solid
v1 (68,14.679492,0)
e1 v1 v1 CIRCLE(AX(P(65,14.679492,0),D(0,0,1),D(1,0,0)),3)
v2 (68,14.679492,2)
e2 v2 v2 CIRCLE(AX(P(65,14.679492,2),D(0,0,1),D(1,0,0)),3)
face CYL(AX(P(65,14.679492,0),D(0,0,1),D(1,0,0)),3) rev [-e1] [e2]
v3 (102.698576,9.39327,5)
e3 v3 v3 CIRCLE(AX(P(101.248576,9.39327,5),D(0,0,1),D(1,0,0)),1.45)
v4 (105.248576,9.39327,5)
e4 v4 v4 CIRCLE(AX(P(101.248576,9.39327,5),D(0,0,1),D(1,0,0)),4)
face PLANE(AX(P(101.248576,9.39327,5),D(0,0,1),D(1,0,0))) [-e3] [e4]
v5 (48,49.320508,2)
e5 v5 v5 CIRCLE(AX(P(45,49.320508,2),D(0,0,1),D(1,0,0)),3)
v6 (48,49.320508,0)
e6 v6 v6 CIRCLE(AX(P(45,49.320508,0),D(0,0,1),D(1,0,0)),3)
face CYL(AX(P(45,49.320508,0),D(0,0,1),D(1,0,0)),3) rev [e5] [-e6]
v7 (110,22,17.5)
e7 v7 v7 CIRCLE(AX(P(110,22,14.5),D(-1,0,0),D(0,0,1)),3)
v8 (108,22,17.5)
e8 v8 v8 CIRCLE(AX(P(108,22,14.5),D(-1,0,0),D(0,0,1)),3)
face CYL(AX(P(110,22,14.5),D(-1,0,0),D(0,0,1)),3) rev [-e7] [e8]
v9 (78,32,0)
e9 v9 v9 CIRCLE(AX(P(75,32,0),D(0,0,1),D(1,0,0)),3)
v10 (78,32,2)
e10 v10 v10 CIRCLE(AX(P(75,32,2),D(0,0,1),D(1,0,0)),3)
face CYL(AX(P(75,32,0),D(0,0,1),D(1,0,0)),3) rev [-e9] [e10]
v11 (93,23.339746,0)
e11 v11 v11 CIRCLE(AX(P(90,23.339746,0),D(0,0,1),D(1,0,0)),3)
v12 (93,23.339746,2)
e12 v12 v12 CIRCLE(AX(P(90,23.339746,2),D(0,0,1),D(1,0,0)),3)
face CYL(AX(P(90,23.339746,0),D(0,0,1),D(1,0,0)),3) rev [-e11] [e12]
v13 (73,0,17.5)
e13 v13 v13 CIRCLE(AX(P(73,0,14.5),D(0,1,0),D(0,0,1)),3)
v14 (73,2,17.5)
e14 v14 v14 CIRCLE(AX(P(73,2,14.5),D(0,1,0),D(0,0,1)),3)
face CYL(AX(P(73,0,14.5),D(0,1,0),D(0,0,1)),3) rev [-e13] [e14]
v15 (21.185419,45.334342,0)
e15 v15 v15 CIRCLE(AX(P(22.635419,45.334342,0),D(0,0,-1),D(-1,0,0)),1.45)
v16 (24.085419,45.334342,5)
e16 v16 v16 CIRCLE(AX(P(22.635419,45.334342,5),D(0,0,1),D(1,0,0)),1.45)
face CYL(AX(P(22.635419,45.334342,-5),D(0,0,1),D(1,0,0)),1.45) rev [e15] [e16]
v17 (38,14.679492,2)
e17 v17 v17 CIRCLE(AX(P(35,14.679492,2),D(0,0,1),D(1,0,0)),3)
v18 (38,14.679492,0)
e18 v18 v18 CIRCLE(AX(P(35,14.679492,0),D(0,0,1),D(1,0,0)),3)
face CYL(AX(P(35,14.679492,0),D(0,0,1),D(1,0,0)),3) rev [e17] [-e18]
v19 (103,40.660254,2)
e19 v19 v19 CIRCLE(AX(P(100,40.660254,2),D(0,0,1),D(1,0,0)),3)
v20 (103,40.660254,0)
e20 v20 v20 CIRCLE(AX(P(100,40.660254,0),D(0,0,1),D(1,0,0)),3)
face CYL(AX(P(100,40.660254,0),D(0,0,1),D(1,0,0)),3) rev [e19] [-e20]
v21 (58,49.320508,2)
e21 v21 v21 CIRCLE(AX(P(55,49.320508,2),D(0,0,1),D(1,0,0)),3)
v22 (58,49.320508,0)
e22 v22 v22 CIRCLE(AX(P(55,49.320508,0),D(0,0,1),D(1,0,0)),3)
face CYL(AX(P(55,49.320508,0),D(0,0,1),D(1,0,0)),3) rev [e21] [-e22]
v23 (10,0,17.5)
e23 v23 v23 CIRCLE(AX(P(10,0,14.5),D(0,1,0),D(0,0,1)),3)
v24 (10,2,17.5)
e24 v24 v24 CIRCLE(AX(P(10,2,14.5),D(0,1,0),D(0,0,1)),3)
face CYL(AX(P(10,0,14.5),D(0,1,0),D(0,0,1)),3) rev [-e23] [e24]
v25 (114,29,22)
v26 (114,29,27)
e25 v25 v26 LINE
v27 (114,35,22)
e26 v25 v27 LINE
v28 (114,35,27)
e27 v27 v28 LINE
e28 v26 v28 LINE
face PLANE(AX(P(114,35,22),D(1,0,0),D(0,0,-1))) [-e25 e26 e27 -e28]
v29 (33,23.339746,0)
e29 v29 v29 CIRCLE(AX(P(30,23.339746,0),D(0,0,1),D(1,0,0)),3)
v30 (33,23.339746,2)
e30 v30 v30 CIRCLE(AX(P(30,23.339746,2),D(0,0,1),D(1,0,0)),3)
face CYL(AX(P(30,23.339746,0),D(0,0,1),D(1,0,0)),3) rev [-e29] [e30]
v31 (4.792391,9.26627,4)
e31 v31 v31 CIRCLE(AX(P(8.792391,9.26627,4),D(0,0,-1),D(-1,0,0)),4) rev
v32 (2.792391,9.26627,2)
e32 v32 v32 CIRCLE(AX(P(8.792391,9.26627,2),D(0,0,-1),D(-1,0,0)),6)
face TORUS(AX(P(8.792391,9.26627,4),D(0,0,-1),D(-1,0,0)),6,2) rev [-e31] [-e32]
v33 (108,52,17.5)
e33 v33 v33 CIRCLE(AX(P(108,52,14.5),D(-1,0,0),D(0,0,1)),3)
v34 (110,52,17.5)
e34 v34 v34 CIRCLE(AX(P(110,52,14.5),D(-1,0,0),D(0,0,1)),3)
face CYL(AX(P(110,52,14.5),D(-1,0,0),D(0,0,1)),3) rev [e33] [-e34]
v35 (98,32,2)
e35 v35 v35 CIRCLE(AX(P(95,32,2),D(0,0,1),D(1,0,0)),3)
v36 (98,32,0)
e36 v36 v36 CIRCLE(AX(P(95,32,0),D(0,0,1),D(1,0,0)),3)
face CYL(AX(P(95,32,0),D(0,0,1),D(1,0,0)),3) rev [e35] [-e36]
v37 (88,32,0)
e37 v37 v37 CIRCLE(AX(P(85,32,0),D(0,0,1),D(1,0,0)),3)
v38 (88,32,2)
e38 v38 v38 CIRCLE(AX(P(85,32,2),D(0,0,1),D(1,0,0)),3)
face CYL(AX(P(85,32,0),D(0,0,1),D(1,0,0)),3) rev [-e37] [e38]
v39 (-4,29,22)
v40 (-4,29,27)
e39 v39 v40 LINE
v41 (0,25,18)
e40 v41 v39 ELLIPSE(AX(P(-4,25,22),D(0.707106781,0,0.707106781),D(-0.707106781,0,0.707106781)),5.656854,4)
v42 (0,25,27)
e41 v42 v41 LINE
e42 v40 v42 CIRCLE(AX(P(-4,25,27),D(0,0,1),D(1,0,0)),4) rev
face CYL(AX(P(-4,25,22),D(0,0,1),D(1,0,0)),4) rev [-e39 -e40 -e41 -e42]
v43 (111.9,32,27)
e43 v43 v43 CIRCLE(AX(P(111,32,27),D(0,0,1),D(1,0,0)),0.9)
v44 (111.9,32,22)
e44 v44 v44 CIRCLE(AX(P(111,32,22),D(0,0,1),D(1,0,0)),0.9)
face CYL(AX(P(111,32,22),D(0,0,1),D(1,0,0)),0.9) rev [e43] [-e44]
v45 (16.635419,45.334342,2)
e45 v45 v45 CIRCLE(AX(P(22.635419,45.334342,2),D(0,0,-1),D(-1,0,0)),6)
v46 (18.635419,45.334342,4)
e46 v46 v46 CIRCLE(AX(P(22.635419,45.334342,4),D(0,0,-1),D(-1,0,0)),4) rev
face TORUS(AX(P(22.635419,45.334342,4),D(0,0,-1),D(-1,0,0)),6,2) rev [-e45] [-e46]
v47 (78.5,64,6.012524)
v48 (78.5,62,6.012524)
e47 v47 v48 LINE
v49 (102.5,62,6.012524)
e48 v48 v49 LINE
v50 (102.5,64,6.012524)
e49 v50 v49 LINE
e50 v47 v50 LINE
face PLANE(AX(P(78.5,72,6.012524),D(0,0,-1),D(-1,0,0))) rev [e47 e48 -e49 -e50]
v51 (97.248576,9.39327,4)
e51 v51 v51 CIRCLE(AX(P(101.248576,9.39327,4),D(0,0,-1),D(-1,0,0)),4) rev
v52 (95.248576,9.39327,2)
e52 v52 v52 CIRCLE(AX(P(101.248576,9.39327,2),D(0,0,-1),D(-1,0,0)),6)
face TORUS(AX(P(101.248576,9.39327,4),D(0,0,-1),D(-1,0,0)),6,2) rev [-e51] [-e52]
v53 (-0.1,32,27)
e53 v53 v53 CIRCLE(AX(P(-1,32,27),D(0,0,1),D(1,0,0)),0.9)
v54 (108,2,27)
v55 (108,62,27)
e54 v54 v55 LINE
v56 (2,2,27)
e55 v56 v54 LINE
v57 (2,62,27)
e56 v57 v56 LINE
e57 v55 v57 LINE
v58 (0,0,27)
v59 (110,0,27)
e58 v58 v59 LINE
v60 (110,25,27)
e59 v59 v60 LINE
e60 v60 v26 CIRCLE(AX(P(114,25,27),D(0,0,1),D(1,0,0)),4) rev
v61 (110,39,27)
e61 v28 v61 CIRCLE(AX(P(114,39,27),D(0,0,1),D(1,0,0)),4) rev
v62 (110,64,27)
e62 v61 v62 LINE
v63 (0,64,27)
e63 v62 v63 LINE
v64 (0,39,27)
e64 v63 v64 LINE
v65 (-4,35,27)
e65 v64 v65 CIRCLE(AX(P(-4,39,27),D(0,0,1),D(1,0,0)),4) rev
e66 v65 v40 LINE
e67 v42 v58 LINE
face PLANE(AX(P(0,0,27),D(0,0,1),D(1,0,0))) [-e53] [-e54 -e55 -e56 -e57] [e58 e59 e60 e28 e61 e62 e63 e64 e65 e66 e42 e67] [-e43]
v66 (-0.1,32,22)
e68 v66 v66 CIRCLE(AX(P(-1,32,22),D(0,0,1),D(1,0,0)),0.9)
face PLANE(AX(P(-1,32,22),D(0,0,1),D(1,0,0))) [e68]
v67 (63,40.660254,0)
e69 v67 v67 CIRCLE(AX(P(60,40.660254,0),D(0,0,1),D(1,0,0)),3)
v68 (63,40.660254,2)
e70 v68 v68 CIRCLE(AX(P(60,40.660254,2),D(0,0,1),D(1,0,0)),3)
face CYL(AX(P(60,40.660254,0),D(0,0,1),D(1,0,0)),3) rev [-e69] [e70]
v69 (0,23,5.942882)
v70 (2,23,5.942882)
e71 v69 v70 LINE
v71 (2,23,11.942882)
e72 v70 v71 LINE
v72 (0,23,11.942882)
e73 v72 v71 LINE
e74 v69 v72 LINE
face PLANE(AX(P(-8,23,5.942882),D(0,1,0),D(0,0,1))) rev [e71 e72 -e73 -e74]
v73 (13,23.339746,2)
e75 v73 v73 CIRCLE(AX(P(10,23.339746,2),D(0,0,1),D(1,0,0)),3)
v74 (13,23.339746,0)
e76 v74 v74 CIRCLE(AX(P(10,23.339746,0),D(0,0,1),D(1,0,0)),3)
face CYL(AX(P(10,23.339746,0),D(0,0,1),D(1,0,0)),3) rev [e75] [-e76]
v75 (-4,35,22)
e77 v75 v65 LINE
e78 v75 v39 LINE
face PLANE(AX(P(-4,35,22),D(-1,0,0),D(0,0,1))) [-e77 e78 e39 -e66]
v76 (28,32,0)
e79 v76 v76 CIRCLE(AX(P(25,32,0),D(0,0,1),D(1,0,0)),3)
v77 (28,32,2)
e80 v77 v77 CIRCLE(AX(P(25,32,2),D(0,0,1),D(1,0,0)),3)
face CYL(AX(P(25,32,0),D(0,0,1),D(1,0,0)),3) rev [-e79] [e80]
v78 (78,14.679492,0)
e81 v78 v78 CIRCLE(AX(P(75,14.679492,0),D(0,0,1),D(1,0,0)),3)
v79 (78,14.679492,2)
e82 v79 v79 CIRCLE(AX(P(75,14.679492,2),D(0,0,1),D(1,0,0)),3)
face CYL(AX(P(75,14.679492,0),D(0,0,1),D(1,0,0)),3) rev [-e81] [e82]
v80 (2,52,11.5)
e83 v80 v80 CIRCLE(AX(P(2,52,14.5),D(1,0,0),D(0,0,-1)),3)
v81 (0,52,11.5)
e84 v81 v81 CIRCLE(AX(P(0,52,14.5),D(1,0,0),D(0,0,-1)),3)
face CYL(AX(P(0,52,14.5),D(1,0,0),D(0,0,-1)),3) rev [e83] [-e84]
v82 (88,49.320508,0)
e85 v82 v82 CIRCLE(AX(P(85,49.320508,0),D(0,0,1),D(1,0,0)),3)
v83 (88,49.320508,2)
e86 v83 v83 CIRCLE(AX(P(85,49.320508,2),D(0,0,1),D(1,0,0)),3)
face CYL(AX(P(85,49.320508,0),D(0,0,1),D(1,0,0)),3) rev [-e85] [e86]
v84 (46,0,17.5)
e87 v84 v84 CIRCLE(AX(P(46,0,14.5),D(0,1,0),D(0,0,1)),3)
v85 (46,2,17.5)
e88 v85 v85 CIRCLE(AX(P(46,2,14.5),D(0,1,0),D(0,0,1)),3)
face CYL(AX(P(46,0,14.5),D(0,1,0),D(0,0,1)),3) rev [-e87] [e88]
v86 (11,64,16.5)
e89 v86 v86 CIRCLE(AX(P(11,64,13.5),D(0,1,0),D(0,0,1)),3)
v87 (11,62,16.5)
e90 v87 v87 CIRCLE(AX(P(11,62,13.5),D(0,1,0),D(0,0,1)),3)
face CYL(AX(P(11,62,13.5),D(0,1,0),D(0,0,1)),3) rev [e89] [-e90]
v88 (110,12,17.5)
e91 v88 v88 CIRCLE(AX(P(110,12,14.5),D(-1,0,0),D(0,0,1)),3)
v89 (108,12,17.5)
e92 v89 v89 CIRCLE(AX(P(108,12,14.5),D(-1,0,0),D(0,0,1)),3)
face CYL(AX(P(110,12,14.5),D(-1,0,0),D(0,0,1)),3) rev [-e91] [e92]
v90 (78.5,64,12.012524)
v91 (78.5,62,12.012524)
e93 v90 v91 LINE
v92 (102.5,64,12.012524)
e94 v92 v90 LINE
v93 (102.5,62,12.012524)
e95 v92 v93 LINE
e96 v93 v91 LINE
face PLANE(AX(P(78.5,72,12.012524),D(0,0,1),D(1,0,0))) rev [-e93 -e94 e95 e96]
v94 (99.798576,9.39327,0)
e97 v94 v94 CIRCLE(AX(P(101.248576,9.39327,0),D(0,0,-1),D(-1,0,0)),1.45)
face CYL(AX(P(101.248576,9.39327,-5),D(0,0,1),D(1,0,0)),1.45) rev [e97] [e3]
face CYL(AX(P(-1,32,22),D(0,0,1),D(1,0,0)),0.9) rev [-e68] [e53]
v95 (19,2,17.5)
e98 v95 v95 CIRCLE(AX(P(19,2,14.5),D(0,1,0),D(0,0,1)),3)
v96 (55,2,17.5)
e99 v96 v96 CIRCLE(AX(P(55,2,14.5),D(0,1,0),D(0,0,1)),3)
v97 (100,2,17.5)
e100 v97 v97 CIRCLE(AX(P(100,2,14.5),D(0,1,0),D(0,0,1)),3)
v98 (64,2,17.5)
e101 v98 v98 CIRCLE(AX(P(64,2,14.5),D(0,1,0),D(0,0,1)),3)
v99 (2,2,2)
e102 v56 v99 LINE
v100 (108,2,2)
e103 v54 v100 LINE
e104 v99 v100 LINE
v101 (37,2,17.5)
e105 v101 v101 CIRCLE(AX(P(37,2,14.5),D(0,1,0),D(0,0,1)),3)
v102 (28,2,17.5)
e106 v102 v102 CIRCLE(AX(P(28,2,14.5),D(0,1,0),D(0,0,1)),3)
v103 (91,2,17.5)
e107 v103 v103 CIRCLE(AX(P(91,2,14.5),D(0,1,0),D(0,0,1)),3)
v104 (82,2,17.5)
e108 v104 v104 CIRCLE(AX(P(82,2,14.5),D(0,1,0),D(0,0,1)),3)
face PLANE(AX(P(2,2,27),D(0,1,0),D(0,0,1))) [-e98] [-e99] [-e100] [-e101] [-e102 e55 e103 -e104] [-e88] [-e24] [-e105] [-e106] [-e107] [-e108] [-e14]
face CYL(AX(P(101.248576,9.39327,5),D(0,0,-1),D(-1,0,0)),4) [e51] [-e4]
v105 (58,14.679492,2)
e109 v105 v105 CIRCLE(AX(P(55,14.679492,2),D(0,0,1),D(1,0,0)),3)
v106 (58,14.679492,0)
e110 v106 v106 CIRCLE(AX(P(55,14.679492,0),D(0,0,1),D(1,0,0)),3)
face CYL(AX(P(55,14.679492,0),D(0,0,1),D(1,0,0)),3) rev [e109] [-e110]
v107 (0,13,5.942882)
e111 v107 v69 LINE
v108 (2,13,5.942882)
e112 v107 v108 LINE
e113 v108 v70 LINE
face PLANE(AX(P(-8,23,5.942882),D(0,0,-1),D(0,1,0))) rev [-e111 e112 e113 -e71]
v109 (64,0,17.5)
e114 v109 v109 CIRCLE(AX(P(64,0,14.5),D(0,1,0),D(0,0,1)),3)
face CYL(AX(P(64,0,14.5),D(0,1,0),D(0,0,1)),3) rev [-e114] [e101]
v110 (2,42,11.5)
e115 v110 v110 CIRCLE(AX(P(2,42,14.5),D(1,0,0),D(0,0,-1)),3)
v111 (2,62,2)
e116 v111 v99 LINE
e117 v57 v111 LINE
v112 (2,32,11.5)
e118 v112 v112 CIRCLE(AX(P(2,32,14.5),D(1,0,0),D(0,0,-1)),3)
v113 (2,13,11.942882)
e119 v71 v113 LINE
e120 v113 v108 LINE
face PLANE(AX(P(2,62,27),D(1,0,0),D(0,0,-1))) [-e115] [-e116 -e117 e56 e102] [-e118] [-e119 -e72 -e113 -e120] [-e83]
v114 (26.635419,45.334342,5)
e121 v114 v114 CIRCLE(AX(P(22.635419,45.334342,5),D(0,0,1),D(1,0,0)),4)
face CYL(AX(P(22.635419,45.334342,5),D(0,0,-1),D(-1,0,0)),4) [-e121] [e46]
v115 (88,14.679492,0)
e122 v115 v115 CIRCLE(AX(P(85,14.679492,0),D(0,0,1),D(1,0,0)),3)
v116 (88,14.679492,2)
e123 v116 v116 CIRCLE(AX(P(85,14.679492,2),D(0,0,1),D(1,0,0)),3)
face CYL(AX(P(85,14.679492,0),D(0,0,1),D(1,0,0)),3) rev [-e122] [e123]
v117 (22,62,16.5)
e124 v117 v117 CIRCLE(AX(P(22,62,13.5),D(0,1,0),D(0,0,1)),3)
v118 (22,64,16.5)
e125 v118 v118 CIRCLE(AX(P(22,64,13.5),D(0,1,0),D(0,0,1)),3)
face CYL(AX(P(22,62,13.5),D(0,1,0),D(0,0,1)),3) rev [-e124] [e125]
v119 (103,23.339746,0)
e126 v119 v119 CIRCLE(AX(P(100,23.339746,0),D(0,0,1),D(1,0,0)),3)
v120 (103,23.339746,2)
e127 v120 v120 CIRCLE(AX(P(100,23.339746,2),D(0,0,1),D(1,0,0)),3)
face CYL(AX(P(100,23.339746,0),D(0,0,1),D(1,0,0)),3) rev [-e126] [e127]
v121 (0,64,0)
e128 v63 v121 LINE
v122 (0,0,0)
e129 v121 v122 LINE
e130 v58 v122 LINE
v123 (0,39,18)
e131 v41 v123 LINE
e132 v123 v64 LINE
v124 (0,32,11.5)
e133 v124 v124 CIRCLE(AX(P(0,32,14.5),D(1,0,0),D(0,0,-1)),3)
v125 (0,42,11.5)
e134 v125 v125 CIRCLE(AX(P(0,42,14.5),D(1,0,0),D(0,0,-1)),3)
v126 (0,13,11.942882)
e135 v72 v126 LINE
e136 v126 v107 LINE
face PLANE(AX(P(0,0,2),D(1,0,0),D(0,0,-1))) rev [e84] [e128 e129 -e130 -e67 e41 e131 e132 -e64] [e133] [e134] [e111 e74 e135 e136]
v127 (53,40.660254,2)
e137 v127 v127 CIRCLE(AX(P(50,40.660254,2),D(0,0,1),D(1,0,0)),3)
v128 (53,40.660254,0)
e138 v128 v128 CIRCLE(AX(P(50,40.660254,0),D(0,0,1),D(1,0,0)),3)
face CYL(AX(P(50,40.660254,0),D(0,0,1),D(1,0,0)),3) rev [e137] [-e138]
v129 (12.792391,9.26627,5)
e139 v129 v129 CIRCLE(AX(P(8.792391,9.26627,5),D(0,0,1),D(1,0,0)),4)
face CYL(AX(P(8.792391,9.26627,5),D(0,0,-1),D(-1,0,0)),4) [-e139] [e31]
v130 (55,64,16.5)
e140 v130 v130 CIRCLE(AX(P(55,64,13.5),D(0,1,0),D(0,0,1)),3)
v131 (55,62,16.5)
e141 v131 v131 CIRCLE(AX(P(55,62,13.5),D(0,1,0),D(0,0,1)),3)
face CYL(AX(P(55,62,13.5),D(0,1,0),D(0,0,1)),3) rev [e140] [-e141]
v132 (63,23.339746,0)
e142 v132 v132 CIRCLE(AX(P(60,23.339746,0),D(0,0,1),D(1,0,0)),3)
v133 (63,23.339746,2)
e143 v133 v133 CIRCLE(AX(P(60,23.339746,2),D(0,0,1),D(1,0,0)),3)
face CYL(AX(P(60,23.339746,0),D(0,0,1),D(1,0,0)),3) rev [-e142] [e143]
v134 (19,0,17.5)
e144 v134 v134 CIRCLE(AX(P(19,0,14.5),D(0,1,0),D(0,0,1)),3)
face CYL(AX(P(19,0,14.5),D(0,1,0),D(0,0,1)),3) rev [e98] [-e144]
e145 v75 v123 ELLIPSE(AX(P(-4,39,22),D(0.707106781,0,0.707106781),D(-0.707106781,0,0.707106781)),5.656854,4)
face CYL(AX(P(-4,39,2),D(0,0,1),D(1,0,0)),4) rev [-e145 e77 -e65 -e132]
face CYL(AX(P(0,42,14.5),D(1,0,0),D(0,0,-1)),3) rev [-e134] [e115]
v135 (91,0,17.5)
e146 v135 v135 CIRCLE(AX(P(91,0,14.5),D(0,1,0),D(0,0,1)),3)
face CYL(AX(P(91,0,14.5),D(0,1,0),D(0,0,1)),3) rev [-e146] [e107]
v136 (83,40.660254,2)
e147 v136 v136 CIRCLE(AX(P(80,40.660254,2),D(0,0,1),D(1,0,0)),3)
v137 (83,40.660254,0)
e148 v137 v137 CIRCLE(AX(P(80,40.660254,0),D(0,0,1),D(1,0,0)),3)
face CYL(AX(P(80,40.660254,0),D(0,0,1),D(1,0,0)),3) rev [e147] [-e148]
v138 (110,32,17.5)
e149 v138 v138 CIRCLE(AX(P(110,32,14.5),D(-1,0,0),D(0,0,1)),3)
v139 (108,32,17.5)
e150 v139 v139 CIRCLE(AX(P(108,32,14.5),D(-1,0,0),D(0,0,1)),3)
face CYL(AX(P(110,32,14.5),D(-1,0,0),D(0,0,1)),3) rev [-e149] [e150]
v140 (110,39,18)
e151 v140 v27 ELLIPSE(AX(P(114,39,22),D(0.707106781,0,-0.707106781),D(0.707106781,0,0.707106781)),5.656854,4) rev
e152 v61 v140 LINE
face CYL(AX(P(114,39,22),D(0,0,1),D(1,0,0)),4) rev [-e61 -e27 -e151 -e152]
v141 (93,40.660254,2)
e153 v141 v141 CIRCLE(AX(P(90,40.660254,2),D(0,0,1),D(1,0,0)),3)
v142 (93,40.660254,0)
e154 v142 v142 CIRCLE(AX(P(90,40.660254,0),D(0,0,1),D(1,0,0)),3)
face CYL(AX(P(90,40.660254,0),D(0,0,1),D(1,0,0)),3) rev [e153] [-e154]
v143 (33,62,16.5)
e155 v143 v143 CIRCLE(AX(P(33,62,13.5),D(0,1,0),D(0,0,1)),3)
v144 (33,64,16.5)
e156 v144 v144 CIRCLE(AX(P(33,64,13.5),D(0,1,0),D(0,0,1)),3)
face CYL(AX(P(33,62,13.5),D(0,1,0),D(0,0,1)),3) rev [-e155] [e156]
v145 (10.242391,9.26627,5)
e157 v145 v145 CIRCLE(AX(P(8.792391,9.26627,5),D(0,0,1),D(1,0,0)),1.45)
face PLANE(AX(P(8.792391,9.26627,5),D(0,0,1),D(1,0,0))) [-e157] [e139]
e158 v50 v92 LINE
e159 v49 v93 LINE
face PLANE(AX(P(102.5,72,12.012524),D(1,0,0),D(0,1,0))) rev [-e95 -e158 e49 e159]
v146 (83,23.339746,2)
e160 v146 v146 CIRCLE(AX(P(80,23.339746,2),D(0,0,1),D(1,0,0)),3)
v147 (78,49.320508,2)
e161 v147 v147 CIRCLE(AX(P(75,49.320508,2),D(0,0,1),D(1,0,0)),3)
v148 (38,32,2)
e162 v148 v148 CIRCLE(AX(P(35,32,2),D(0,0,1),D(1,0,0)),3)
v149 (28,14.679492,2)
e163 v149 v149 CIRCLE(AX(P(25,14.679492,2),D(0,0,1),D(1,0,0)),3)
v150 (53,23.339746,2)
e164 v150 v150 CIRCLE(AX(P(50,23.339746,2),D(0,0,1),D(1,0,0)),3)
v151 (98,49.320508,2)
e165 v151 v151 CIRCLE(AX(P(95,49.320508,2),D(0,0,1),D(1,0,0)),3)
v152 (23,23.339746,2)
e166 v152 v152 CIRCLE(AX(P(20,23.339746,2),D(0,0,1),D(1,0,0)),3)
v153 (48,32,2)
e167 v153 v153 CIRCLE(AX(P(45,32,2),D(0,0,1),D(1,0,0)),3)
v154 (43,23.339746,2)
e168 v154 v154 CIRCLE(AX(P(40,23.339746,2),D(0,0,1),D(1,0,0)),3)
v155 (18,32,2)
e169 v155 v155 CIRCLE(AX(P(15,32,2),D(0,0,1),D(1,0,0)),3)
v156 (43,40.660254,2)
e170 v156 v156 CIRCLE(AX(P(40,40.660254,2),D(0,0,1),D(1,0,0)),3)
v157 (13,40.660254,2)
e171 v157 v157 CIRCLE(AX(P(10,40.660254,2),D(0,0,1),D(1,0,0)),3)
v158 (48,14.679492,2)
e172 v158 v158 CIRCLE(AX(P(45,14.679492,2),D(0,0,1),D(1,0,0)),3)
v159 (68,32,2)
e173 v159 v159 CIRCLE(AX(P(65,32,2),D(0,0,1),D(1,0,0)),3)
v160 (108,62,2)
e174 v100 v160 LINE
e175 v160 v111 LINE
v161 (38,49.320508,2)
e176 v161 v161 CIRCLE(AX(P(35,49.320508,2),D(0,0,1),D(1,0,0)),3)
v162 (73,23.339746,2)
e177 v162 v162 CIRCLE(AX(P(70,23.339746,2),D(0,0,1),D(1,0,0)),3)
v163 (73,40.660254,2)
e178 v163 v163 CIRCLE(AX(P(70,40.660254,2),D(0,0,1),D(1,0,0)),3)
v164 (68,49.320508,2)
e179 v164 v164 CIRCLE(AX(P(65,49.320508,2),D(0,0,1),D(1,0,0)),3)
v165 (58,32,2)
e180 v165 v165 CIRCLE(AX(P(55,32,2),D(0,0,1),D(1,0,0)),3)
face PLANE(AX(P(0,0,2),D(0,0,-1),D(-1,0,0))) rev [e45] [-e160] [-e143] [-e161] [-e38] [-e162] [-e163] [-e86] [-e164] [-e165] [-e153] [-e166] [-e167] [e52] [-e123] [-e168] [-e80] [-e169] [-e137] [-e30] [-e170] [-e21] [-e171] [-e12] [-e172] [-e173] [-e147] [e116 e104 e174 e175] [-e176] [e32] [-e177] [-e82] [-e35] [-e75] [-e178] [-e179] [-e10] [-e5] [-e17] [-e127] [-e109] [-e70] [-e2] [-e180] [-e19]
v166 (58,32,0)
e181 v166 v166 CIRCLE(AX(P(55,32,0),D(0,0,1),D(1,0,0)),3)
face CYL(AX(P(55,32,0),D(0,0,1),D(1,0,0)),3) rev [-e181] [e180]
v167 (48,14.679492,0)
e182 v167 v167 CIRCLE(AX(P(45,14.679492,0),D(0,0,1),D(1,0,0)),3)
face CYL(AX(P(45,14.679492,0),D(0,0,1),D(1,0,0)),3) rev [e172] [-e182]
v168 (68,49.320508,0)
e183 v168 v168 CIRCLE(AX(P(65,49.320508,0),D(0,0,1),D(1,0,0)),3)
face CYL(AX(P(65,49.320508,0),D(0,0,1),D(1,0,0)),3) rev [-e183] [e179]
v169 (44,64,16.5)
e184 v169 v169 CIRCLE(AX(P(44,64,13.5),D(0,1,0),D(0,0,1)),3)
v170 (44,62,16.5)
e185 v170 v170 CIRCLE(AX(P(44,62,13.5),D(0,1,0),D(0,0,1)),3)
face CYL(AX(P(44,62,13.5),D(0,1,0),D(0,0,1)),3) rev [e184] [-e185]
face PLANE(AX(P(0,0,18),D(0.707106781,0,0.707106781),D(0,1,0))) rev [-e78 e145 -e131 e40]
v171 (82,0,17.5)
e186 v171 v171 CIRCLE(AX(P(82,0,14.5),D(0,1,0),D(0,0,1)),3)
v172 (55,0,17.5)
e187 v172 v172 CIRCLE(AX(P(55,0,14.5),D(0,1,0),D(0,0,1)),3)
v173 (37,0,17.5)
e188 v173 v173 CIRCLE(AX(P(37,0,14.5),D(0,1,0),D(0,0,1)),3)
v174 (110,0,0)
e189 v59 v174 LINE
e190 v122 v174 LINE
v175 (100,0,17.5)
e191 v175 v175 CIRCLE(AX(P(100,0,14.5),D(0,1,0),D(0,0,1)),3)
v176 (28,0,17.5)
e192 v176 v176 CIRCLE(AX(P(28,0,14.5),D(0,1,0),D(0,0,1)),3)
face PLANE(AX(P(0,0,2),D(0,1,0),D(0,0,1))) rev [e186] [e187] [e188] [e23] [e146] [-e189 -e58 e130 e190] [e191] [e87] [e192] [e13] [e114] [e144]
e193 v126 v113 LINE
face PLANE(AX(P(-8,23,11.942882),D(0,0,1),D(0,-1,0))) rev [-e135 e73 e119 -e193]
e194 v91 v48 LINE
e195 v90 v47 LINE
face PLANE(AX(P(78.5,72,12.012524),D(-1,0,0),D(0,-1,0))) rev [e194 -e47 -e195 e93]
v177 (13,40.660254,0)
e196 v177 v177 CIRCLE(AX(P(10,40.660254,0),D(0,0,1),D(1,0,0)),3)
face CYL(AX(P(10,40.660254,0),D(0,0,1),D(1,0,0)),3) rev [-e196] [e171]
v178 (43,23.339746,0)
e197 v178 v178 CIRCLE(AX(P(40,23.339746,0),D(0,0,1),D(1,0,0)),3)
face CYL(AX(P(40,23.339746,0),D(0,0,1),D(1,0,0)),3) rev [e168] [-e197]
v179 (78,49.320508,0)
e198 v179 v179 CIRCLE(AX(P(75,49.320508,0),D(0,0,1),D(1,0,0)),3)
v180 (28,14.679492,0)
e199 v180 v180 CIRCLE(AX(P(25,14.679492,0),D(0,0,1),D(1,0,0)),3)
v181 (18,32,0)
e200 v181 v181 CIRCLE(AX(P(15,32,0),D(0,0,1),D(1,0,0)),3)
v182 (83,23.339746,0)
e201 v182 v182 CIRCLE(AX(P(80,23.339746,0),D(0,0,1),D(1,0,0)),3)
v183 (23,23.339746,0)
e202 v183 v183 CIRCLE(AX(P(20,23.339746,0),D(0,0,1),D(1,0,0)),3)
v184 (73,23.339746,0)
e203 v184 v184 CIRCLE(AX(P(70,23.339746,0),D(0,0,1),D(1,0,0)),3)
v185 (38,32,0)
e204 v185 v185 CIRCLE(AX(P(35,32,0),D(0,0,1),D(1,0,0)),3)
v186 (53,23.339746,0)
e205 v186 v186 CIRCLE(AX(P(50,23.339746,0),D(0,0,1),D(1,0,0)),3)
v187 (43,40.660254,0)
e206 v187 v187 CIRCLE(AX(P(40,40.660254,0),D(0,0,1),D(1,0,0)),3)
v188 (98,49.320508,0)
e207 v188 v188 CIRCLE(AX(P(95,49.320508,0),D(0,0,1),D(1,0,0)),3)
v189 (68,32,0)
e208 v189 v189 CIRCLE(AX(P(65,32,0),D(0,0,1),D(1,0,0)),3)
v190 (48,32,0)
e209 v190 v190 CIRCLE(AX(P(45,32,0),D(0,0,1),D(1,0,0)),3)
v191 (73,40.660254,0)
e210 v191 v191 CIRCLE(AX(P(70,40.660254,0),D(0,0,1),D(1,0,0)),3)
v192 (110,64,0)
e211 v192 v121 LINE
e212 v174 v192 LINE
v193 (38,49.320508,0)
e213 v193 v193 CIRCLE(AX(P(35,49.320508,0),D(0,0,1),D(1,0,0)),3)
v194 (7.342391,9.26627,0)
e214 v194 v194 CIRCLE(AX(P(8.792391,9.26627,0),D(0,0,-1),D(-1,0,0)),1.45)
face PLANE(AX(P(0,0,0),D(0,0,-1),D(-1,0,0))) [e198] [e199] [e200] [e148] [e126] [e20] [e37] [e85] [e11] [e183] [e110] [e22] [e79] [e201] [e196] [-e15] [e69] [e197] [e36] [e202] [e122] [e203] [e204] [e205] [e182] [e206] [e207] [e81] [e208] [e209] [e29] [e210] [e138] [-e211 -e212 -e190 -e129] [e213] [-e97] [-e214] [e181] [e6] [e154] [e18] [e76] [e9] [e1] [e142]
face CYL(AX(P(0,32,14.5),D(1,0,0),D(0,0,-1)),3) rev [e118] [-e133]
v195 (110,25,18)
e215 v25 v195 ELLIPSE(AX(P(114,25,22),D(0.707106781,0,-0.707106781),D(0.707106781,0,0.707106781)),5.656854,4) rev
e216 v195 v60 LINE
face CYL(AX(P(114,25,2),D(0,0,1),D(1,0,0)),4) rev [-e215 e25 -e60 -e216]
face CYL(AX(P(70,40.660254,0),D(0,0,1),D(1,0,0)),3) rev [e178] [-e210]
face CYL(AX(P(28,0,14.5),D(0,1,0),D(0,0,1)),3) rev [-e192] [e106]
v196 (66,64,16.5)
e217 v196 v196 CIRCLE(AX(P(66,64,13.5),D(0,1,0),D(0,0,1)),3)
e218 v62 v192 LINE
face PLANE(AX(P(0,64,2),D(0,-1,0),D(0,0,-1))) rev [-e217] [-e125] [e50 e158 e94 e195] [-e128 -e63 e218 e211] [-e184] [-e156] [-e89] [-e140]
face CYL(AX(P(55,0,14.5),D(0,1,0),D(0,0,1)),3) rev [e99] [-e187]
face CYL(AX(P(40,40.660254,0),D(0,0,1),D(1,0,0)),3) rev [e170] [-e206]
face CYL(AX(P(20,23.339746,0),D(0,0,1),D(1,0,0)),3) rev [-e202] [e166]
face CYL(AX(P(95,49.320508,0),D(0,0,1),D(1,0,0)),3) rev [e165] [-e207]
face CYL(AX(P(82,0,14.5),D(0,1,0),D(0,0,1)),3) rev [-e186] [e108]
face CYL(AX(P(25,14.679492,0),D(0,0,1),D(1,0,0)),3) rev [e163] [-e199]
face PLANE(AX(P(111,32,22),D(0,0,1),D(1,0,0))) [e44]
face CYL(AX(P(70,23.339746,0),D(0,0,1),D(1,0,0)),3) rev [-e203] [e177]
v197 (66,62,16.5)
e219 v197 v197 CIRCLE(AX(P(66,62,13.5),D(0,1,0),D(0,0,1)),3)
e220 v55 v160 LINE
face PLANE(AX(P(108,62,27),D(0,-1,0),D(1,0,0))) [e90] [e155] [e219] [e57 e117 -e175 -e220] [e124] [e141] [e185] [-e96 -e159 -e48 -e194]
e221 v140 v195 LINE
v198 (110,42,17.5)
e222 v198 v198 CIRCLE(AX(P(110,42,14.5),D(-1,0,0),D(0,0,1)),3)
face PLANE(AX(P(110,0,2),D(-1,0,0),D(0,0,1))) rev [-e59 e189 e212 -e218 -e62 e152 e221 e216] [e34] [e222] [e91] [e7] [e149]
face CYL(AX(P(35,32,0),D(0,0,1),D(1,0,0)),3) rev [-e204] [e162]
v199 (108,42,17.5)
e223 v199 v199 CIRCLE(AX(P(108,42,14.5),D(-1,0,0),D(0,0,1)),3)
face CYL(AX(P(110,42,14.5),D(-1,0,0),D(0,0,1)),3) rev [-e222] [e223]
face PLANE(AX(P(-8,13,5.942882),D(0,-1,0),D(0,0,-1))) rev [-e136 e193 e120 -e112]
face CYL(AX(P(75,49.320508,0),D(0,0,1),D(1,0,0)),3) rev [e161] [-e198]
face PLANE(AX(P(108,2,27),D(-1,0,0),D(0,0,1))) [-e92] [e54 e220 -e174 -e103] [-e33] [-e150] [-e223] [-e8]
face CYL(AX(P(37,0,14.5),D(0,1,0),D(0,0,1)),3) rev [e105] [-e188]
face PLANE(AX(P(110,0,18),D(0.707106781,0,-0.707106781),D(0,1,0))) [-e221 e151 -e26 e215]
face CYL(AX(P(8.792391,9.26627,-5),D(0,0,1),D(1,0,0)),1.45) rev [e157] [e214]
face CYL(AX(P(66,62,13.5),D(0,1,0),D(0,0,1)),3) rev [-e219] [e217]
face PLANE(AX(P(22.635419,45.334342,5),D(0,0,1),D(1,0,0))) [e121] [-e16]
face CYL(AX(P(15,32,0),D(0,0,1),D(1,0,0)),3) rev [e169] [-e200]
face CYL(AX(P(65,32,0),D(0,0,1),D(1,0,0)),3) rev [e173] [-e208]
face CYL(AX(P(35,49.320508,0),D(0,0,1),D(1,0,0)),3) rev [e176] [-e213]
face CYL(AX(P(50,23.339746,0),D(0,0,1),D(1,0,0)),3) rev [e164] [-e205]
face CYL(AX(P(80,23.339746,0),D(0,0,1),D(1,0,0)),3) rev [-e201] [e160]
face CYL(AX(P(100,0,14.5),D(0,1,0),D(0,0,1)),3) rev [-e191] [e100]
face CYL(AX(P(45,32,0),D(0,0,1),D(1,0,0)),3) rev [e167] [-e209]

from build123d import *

# Parameters (mm, degrees)
SKETCH_1_W          = 110
SKETCH_1_H          = 64
EXTRUDE_1_DEPTH     = 2
SKETCH_2_W          = 110
SKETCH_2_H          = 64
SKETCH_2_W_2        = 106
SKETCH_2_H_2        = 60
EXTRUDE_2_DEPTH     = 25
SKETCH_3_R          = 4
EXTRUDE_3_DEPTH     = 3
SKETCH_4_R          = 1.45
CUT_EXTRUDE_1_DEPTH = 10
FILLET_1_R          = 2
SKETCH_5_W          = 24
SKETCH_5_H          = 6
CUT_EXTRUDE_2_DEPTH = 10
SKETCH_6_W          = 6
SKETCH_6_H          = 10
CUT_EXTRUDE_3_DEPTH = 10
SKETCH_7_W          = 4
SKETCH_7_H          = 6
EXTRUDE_4_DEPTH     = 5
CHAMFER_1_SIZE      = 4
SKETCH_8_R          = 0.9
CUT_EXTRUDE_4_DEPTH = 5
SKETCH_9_R          = 3
CUT_EXTRUDE_5_DEPTH = 2
OTHER_1_OUTLINE_R   = 3
OTHER_1_DEPTH       = 2
SKETCH_10_R         = 3
CUT_EXTRUDE_6_DEPTH = 2
OTHER_START         = 62
OTHER_2_OUTLINE_R   = 3
OTHER_2_DEPTH       = 2
SKETCH_11_R         = 3
CUT_EXTRUDE_7_DEPTH = 2
OTHER_3_OUTLINE_R   = 3
OTHER_3_DEPTH       = 2
SKETCH_12_R         = 3
CUT_EXTRUDE_8_DEPTH = 2
OTHER_4_OUTLINE_R   = 3
OTHER_4_DEPTH       = 2
CUT_EXTRUDE_START   = -2
SKETCH_13_R         = 3
CUT_EXTRUDE_9_DEPTH = 2
OTHER_START_2       = 108
OTHER_5_OUTLINE_R   = 3
OTHER_5_DEPTH       = 2
FILLET_2_R          = 4


with BuildPart() as part:
    # 草图1 → 凸台-拉伸1 (new body)
    with BuildSketch(Plane.XY):
        with Locations((55, 32)):
            Rectangle(SKETCH_1_W, SKETCH_1_H)
    extrude(amount=EXTRUDE_1_DEPTH)

    # 草图2 → 凸台-拉伸2 (add)
    with BuildSketch(Plane.XY.offset(2)):
        with Locations((55, 32)):
            Rectangle(SKETCH_2_W, SKETCH_2_H)
        with Locations((55, 32)):
            Rectangle(SKETCH_2_W_2, SKETCH_2_H_2, mode=Mode.SUBTRACT)
    extrude(amount=EXTRUDE_2_DEPTH)

    # 草图3 → 凸台-拉伸3 (add)
    with BuildSketch(Plane.XY.offset(2)):
        with Locations(Location((22.635418977, 45.334342238, 0), (0, 0, 180))):
            Circle(SKETCH_3_R)
        with Locations(Location((8.792391291, 9.266270102, 0), (0, 0, 180))):
            Circle(SKETCH_3_R)
        with Locations(Location((101.248576203, 9.393270356, 0), (0, 0, 180))):
            Circle(SKETCH_3_R)
    extrude(amount=EXTRUDE_3_DEPTH)

    # 草图4 → 切除-拉伸1 (cut)
    with BuildSketch(Plane.XY.offset(5)):
        with Locations((22.635418977, 45.334342238)):
            Circle(SKETCH_4_R)
        with Locations((8.792391291, 9.266270102)):
            Circle(SKETCH_4_R)
        with Locations((101.248576203, 9.393270356)):
            Circle(SKETCH_4_R)
    extrude(amount=-CUT_EXTRUDE_1_DEPTH, mode=Mode.SUBTRACT)

    # 圆角1
    fillet_1_edges = [part.edges().sort_by_distance(p)[0] for p in [
        (105.248576203, 9.393270356, 2),
        (12.792391291, 9.266270102, 2),
        (26.635418977, 45.334342238, 2),
    ]]
    fillet(fillet_1_edges, radius=FILLET_1_R)

    # 草图5 → 切除-拉伸2 (cut)
    with BuildSketch(Plane(origin=(0, 62, 0), x_dir=(-1, 0, 0), z_dir=(0, -1, 0))):
        with Locations((-90.5, -9.012523577)):
            Rectangle(SKETCH_5_W, SKETCH_5_H)
    extrude(amount=-CUT_EXTRUDE_2_DEPTH, mode=Mode.SUBTRACT)

    # 草图6 → 切除-拉伸3 (cut)
    with BuildSketch(Plane(origin=(2, 0, 0), x_dir=(0, 0, -1), z_dir=(1, 0, 0))):
        with Locations((-8.94288238, 18)):
            Rectangle(SKETCH_6_W, SKETCH_6_H)
    extrude(amount=-CUT_EXTRUDE_3_DEPTH, mode=Mode.SUBTRACT)

    # 草图7 → 凸台-拉伸4 (add)
    with BuildSketch(Plane.XY.offset(27)):
        with Locations((-2, 32)):
            Rectangle(SKETCH_7_W, SKETCH_7_H)
        with Locations((112, 32)):
            Rectangle(SKETCH_7_W, SKETCH_7_H)
    extrude(amount=-EXTRUDE_4_DEPTH)

    # 倒角1
    chamfer_1_edges = [part.edges().sort_by_distance(p)[0] for p in [
        (110, 32, 22),
        (0, 32, 22),
    ]]
    chamfer(chamfer_1_edges, length=CHAMFER_1_SIZE - 0.0001)  # a hair under: the kernel refuses the full size

    # 草图8 → 切除-拉伸4 (cut)
    with BuildSketch(Plane.XY.offset(27)):
        with Locations((-1, 32)):
            Circle(SKETCH_8_R)
        with Locations((111, 32)):
            Circle(SKETCH_8_R)
    extrude(amount=-CUT_EXTRUDE_4_DEPTH, mode=Mode.SUBTRACT)

    # 草图9 → 切除-拉伸5 (cut)
    with BuildSketch(Plane.XY.offset(2)):
        with Locations((55, 32)):
            Circle(SKETCH_9_R)
    extrude(amount=-CUT_EXTRUDE_5_DEPTH, mode=Mode.SUBTRACT)

    # 填充阵列1: read off the stored shape, not the designer's step
    # 填充阵列1 outline → 填充阵列1 (cut)
    with BuildSketch(Plane.XY):
        with Locations((10, 40.660254038)):
            Circle(OTHER_1_OUTLINE_R)
        with Locations((90, 40.660254038)):
            Circle(OTHER_1_OUTLINE_R)
        with Locations((95, 49.320508076)):
            Circle(OTHER_1_OUTLINE_R)
        with Locations((85, 14.679491924)):
            Circle(OTHER_1_OUTLINE_R)
        with Locations((90, 23.339745962)):
            Circle(OTHER_1_OUTLINE_R)
        with Locations((95, 32)):
            Circle(OTHER_1_OUTLINE_R)
        with Locations((100, 40.660254038)):
            Circle(OTHER_1_OUTLINE_R)
        with Locations((100, 23.339745962)):
            Circle(OTHER_1_OUTLINE_R)
        with Locations((40, 40.660254038)):
            Circle(OTHER_1_OUTLINE_R)
        with Locations((45, 49.320508076)):
            Circle(OTHER_1_OUTLINE_R)
        with Locations((35, 14.679491924)):
            Circle(OTHER_1_OUTLINE_R)
        with Locations((40, 23.339745962)):
            Circle(OTHER_1_OUTLINE_R)
        with Locations((45, 14.679491924)):
            Circle(OTHER_1_OUTLINE_R)
        with Locations((55, 49.320508076)):
            Circle(OTHER_1_OUTLINE_R)
        with Locations((50, 40.660254038)):
            Circle(OTHER_1_OUTLINE_R)
        with Locations((45, 32)):
            Circle(OTHER_1_OUTLINE_R)
        with Locations((25, 32)):
            Circle(OTHER_1_OUTLINE_R)
        with Locations((20, 23.339745962)):
            Circle(OTHER_1_OUTLINE_R)
        with Locations((15, 32)):
            Circle(OTHER_1_OUTLINE_R)
        with Locations((10, 23.339745962)):
            Circle(OTHER_1_OUTLINE_R)
        with Locations((35, 32)):
            Circle(OTHER_1_OUTLINE_R)
        with Locations((30, 23.339745962)):
            Circle(OTHER_1_OUTLINE_R)
        with Locations((25, 14.679491924)):
            Circle(OTHER_1_OUTLINE_R)
        with Locations((35, 49.320508076)):
            Circle(OTHER_1_OUTLINE_R)
        with Locations((65, 14.679491924)):
            Circle(OTHER_1_OUTLINE_R)
        with Locations((70, 23.339745962)):
            Circle(OTHER_1_OUTLINE_R)
        with Locations((75, 32)):
            Circle(OTHER_1_OUTLINE_R)
        with Locations((80, 40.660254038)):
            Circle(OTHER_1_OUTLINE_R)
        with Locations((85, 32)):
            Circle(OTHER_1_OUTLINE_R)
        with Locations((80, 23.339745962)):
            Circle(OTHER_1_OUTLINE_R)
        with Locations((75, 14.679491924)):
            Circle(OTHER_1_OUTLINE_R)
        with Locations((85, 49.320508076)):
            Circle(OTHER_1_OUTLINE_R)
        with Locations((55, 14.679491924)):
            Circle(OTHER_1_OUTLINE_R)
        with Locations((65, 49.320508076)):
            Circle(OTHER_1_OUTLINE_R)
        with Locations((60, 40.660254038)):
            Circle(OTHER_1_OUTLINE_R)
        with Locations((50, 23.339745962)):
            Circle(OTHER_1_OUTLINE_R)
        with Locations((60, 23.339745962)):
            Circle(OTHER_1_OUTLINE_R)
        with Locations((65, 32)):
            Circle(OTHER_1_OUTLINE_R)
        with Locations((70, 40.660254038)):
            Circle(OTHER_1_OUTLINE_R)
        with Locations((75, 49.320508076)):
            Circle(OTHER_1_OUTLINE_R)
    extrude(amount=OTHER_1_DEPTH, mode=Mode.SUBTRACT)

    # 草图10 → 切除-拉伸6 (cut)
    with BuildSketch(Plane(origin=(0, 64, 0), x_dir=(1, 0, 0), z_dir=(0, 1, 0))):
        with Locations(Location((55, -13.5, 0), (0, 0, 270))):
            Circle(SKETCH_10_R)
    extrude(amount=-CUT_EXTRUDE_6_DEPTH, mode=Mode.SUBTRACT)

    # 填充阵列2: read off the stored shape, not the designer's step
    # 填充阵列2 outline → 填充阵列2 (cut)
    with BuildSketch(Plane(origin=(0, 0, 0), x_dir=(1, 0, 0), z_dir=(0, 1, 0)).offset(OTHER_START)):
        with Locations((11, -13.5)):
            Circle(OTHER_2_OUTLINE_R)
        with Locations((22, -13.5)):
            Circle(OTHER_2_OUTLINE_R)
        with Locations((33, -13.5)):
            Circle(OTHER_2_OUTLINE_R)
        with Locations((44, -13.5)):
            Circle(OTHER_2_OUTLINE_R)
        with Locations((66, -13.5)):
            Circle(OTHER_2_OUTLINE_R)
    extrude(amount=OTHER_2_DEPTH, mode=Mode.SUBTRACT)

    # 草图11 → 切除-拉伸7 (cut)
    with BuildSketch(Plane(origin=(0, 2, 0), x_dir=(1, 0, 0), z_dir=(0, 1, 0))):
        with Locations(Location((55, -14.5, 0), (0, 0, 270))):
            Circle(SKETCH_11_R)
    extrude(amount=-CUT_EXTRUDE_7_DEPTH, mode=Mode.SUBTRACT)

    # 填充阵列3: read off the stored shape, not the designer's step
    # 填充阵列3 outline → 填充阵列3 (cut)
    with BuildSketch(Plane(origin=(0, 0, 0), x_dir=(1, 0, 0), z_dir=(0, 1, 0))):
        with Locations((100, -14.5)):
            Circle(OTHER_3_OUTLINE_R)
        with Locations((91, -14.5)):
            Circle(OTHER_3_OUTLINE_R)
        with Locations((82, -14.5)):
            Circle(OTHER_3_OUTLINE_R)
        with Locations((73, -14.5)):
            Circle(OTHER_3_OUTLINE_R)
        with Locations((64, -14.5)):
            Circle(OTHER_3_OUTLINE_R)
        with Locations((46, -14.5)):
            Circle(OTHER_3_OUTLINE_R)
        with Locations((37, -14.5)):
            Circle(OTHER_3_OUTLINE_R)
        with Locations((28, -14.5)):
            Circle(OTHER_3_OUTLINE_R)
        with Locations((19, -14.5)):
            Circle(OTHER_3_OUTLINE_R)
        with Locations((10, -14.5)):
            Circle(OTHER_3_OUTLINE_R)
    extrude(amount=OTHER_3_DEPTH, mode=Mode.SUBTRACT)

    # 草图12 → 切除-拉伸8 (cut)
    with BuildSketch(Plane(origin=(2, 0, 0), x_dir=(0, 0, -1), z_dir=(1, 0, 0))):
        with Locations((-14.5, 32)):
            Circle(SKETCH_12_R)
    extrude(amount=-CUT_EXTRUDE_8_DEPTH, mode=Mode.SUBTRACT)

    # 填充阵列4: read off the stored shape, not the designer's step
    # 填充阵列4 outline → 填充阵列4 (cut)
    with BuildSketch(Plane.YZ):
        with Locations((42, 14.5)):
            Circle(OTHER_4_OUTLINE_R)
        with Locations((52, 14.5)):
            Circle(OTHER_4_OUTLINE_R)
    extrude(amount=OTHER_4_DEPTH, mode=Mode.SUBTRACT)

    # 草图13 → 切除-拉伸9 (cut)
    with BuildSketch(Plane.ZY.offset(-108).offset(CUT_EXTRUDE_START)):
        with Locations(Location((14.5, 32, 0), (0, 0, 180))):
            Circle(SKETCH_13_R)
    extrude(amount=CUT_EXTRUDE_9_DEPTH, mode=Mode.SUBTRACT)

    # 填充阵列5: read off the stored shape, not the designer's step
    # 填充阵列5 outline → 填充阵列5 (cut)
    with BuildSketch(Plane.YZ.offset(OTHER_START_2)):
        with Locations((42, 14.5)):
            Circle(OTHER_5_OUTLINE_R)
        with Locations((52, 14.5)):
            Circle(OTHER_5_OUTLINE_R)
        with Locations((22, 14.5)):
            Circle(OTHER_5_OUTLINE_R)
        with Locations((12, 14.5)):
            Circle(OTHER_5_OUTLINE_R)
    extrude(amount=OTHER_5_DEPTH, mode=Mode.SUBTRACT)

    # 圆角2
    fillet_2_edges = [part.edges().sort_by_distance(p)[0] for p in [
        (110, 35, 22.50005),
        (110, 29, 22.50005),
        (0, 35, 22.50005),
        (0, 29, 22.50005),
    ]]
    fillet(fillet_2_edges, radius=FILLET_2_R - 0.0001)  # a hair under: the kernel refuses the full size


solid = part.part
